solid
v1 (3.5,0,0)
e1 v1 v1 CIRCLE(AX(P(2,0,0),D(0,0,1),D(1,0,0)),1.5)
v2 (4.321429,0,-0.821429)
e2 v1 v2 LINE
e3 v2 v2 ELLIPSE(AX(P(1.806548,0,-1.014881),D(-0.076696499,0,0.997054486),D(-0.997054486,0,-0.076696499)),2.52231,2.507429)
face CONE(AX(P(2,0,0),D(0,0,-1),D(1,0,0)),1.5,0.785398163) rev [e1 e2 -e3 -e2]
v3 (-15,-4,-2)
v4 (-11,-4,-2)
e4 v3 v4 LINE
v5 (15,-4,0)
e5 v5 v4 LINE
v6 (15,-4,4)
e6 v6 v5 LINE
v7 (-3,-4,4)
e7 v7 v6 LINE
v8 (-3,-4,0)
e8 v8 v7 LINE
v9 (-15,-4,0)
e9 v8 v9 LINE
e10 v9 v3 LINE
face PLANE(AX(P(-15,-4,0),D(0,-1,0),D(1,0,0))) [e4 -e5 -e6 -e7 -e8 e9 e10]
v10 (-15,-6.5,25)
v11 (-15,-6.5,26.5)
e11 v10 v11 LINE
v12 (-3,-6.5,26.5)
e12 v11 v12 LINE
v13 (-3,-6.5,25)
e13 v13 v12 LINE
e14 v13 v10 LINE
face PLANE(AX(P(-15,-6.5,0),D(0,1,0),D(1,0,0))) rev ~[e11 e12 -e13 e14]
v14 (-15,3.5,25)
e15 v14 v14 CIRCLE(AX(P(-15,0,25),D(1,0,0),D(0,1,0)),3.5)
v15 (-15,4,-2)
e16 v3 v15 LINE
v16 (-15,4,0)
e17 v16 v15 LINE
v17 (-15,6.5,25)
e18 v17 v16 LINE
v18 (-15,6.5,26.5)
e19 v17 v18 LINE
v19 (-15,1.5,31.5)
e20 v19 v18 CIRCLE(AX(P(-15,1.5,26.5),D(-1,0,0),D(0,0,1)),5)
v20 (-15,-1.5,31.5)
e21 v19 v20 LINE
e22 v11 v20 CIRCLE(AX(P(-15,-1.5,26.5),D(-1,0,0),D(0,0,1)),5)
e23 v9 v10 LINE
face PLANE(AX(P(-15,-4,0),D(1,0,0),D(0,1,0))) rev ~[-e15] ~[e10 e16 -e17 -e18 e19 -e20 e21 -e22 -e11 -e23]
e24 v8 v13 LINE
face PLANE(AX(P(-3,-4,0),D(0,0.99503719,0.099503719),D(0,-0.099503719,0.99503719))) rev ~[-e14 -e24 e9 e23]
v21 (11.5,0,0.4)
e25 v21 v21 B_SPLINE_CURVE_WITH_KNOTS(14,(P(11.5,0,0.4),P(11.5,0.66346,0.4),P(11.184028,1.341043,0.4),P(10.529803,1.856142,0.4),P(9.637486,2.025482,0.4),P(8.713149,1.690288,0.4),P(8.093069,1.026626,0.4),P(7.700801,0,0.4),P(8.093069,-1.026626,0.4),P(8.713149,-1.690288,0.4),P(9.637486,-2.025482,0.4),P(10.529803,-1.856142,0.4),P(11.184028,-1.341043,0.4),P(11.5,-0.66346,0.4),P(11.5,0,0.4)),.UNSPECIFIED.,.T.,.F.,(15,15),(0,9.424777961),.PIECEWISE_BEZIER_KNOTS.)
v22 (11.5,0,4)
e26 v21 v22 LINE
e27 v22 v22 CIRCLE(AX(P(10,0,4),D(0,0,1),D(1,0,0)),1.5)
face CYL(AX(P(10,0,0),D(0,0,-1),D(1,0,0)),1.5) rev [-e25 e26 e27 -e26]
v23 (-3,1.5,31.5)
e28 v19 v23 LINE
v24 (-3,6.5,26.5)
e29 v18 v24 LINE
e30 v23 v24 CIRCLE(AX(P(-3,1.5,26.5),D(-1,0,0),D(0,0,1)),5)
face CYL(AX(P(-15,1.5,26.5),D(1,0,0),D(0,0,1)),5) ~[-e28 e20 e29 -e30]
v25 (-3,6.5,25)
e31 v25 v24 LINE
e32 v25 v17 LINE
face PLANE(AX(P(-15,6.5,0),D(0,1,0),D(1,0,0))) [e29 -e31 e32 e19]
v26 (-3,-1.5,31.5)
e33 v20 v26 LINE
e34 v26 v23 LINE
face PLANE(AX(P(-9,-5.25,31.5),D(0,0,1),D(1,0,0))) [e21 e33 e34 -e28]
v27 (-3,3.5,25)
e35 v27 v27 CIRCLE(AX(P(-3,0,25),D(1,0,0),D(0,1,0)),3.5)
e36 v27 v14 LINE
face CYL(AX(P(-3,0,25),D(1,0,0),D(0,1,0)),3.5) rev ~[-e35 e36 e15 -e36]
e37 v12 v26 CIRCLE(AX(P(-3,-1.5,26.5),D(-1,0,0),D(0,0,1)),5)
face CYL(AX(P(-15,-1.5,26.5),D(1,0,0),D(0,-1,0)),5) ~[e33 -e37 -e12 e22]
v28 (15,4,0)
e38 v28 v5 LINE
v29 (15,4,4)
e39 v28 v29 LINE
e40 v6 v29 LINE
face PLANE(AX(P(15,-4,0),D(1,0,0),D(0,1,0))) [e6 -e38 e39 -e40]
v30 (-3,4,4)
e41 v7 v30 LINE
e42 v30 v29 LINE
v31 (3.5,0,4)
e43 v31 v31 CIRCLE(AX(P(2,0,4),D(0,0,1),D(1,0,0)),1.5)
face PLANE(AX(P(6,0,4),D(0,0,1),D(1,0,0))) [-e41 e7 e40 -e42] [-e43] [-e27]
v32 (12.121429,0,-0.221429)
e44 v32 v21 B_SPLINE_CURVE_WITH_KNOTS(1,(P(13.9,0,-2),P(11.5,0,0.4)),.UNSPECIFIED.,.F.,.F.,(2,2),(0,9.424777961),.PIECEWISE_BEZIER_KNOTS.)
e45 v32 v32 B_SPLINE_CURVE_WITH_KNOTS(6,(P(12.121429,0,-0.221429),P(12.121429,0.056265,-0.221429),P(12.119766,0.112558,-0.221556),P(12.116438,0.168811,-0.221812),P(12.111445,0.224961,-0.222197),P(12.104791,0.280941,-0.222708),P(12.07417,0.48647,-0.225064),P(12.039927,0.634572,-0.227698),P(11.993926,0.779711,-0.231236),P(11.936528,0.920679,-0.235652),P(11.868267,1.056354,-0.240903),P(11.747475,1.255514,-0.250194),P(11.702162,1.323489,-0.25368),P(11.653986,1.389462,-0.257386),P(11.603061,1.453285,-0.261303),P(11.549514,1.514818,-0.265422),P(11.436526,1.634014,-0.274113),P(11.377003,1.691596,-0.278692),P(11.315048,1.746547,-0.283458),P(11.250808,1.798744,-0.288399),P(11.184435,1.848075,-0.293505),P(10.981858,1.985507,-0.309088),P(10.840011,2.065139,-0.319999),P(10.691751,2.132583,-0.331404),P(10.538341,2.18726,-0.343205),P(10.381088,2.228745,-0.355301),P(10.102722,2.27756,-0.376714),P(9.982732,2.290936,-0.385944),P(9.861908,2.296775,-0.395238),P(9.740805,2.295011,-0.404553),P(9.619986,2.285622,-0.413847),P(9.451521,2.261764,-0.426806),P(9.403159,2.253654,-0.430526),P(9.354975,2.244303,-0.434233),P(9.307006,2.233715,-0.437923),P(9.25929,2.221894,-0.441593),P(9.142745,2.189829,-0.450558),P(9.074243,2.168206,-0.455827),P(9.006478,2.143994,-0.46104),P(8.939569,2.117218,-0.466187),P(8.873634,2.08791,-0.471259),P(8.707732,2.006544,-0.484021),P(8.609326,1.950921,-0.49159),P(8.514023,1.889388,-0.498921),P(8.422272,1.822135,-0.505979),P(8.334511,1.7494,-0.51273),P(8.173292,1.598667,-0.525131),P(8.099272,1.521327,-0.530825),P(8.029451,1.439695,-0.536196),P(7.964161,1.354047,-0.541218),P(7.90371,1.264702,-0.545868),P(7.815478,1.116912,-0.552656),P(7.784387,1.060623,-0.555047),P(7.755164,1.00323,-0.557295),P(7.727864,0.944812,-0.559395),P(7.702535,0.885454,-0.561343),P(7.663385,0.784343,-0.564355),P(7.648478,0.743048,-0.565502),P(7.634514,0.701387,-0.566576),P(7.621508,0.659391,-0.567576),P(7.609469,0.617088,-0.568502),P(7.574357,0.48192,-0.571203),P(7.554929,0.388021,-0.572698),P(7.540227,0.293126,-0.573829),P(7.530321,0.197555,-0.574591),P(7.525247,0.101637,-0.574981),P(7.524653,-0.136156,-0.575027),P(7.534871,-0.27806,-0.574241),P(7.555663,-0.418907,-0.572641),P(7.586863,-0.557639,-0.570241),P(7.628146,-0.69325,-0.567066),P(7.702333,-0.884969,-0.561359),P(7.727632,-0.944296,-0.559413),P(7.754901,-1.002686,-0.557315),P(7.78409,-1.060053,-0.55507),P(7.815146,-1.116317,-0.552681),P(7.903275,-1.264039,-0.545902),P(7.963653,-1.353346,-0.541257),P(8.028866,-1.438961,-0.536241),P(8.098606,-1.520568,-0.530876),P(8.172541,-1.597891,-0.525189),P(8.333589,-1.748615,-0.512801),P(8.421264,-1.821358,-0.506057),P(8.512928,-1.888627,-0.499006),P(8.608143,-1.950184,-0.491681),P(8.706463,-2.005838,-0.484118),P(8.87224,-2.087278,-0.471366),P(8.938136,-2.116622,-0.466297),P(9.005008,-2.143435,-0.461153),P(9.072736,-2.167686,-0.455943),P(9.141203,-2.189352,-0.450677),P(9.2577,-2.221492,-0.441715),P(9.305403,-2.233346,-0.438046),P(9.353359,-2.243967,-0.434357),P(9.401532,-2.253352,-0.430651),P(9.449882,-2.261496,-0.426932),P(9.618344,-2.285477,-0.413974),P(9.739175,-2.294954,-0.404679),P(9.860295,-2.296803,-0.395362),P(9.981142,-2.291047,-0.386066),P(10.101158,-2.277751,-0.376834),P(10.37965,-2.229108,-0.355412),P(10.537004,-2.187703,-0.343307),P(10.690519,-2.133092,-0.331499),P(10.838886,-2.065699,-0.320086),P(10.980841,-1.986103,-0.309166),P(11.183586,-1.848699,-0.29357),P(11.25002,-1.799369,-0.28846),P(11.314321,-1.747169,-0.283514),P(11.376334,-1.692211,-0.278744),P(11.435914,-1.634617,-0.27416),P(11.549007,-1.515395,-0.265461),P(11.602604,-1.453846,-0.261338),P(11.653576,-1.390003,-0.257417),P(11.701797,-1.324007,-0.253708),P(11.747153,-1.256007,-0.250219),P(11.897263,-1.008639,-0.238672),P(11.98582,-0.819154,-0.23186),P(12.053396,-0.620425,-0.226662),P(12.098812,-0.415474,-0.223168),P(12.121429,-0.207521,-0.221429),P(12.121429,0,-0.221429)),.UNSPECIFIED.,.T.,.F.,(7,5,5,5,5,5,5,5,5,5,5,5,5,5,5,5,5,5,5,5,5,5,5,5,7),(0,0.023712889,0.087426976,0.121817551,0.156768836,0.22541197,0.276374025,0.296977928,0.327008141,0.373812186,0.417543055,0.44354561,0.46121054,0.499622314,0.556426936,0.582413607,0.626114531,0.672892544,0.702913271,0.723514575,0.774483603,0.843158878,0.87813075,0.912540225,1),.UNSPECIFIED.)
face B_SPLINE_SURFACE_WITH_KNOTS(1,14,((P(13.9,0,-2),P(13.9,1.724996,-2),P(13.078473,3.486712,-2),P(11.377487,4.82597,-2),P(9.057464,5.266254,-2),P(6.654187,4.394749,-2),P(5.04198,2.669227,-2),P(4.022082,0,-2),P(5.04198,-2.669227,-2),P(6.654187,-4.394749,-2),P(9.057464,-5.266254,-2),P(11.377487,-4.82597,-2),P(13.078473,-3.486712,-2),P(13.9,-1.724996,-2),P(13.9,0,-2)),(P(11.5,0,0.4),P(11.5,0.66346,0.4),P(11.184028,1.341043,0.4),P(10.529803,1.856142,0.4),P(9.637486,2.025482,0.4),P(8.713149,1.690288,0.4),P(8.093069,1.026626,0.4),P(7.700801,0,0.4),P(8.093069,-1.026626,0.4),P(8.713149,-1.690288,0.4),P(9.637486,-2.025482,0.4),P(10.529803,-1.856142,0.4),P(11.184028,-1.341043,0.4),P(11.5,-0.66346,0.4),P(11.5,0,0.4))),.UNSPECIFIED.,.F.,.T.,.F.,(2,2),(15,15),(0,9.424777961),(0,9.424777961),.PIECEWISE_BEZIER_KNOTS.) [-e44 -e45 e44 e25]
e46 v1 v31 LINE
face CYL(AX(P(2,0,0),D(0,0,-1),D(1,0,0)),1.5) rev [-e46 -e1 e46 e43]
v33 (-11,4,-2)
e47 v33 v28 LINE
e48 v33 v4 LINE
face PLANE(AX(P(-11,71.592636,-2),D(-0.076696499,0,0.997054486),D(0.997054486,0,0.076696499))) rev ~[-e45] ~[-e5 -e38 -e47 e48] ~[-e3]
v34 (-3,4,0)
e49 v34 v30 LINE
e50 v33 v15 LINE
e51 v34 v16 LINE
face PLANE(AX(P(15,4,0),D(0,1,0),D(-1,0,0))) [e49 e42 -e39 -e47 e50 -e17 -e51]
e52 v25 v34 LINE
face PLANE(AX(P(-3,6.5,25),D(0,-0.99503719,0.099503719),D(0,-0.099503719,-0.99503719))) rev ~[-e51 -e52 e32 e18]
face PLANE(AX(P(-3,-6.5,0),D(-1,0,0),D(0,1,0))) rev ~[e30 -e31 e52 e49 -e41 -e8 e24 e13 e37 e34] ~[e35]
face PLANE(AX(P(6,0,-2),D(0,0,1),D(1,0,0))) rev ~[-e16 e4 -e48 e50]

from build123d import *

# Parameters (mm, degrees)
F0_W        = 18
F0_H        = 8
F0_R        = 1.5
F1_DEPTH    = 4
F0_W_2      = 12
F0_H_2      = 2.5
F2_DEPTH    = 31.5
F3_R        = 3.5
F4_DEPTH    = 12.001
F5_R        = 5
F6_DEPTH    = 2
F8_SIZE     = 2.4
F9_T1_DEPTH = 143.1852716253


# Not quite as in the source:
# - a fillet or chamfer that OpenCascade refuses, or shapes differently, is made with other operations: its cross-section is extruded or revolved along the edge and cut away or added


with BuildPart() as f1:
    # F0 (on Top) → F1 (new body)
    with BuildSketch(Plane.XY):
        with Locations((6, 0)):
            Rectangle(F0_W, F0_H)
        with Locations((2, 0)):
            Circle(F0_R, mode=Mode.SUBTRACT)
        with Locations((10, 0)):
            Circle(F0_R, mode=Mode.SUBTRACT)
    extrude(amount=F1_DEPTH)

    # F0 (on Top) → F2 (join)
    with BuildSketch(Plane.XY):
        with Locations((-9, -5.25)):
            Rectangle(F0_W_2, F0_H_2)
        with Locations((-9, 0)):
            Rectangle(F0_W_2, F0_H)
        with Locations((-9, 5.25)):
            Rectangle(F0_W_2, F0_H_2)
    extrude(amount=F2_DEPTH)

    # F3 (on face) → F4 (cut, through all)
    with BuildSketch(Plane.YZ.offset(-3)):
        Polygon((-6.5, 0), (-4, 0), (-6.5, 25), align=None)
        Polygon((6.5, 25), (4, 0), (6.5, 0), align=None)
        with Locations((0, 25)):
            Circle(F3_R)
    extrude(amount=-F4_DEPTH, mode=Mode.SUBTRACT)

    # F5
    f5_edges = [f1.edges().sort_by_distance(p)[0] for p in [
        (-9, 6.5, 31.5),
        (-9, -6.5, 31.5),
    ]]
    fillet(f5_edges, radius=F5_R)

    # F0 (on Top) → F6 (join)
    with BuildSketch(Plane.XY):
        with Locations((6, 0)):
            Rectangle(F0_W, F0_H)
        with Locations((2, 0)):
            Circle(F0_R, mode=Mode.SUBTRACT)
        with Locations((10, 0)):
            Circle(F0_R, mode=Mode.SUBTRACT)
        with Locations((-9, 0)):
            Rectangle(F0_W_2, F0_H)
    extrude(amount=-F6_DEPTH)

    # F7: chamfer of 2 on 1 edges, made by hand

    # F7_s1 → F7_t2 (revolve, cut)
    with BuildSketch(Plane.XZ):
        Polygon((3.5, 0), (5.5, -2), (3.5, -2), align=None)
    revolve(axis=Axis((2, 0, -2), (0, 0, 1)), mode=Mode.SUBTRACT)

    # F8
    f8_edges = [f1.edges().sort_by_distance(p)[0] for p in [
        (8.5, 0, -2),
    ]]
    chamfer(f8_edges, length=F8_SIZE)

    # F9: chamfer of 2 x 26 on 1 edges, made by hand

    # F9_s2 → F9_t1 (cut)
    with BuildSketch(Plane.XZ.offset(-71.5926358126)):
        Polygon((-11, -2), (15, 0), (15, -2), align=None)
    extrude(amount=F9_T1_DEPTH, mode=Mode.SUBTRACT)


solid = f1.part
